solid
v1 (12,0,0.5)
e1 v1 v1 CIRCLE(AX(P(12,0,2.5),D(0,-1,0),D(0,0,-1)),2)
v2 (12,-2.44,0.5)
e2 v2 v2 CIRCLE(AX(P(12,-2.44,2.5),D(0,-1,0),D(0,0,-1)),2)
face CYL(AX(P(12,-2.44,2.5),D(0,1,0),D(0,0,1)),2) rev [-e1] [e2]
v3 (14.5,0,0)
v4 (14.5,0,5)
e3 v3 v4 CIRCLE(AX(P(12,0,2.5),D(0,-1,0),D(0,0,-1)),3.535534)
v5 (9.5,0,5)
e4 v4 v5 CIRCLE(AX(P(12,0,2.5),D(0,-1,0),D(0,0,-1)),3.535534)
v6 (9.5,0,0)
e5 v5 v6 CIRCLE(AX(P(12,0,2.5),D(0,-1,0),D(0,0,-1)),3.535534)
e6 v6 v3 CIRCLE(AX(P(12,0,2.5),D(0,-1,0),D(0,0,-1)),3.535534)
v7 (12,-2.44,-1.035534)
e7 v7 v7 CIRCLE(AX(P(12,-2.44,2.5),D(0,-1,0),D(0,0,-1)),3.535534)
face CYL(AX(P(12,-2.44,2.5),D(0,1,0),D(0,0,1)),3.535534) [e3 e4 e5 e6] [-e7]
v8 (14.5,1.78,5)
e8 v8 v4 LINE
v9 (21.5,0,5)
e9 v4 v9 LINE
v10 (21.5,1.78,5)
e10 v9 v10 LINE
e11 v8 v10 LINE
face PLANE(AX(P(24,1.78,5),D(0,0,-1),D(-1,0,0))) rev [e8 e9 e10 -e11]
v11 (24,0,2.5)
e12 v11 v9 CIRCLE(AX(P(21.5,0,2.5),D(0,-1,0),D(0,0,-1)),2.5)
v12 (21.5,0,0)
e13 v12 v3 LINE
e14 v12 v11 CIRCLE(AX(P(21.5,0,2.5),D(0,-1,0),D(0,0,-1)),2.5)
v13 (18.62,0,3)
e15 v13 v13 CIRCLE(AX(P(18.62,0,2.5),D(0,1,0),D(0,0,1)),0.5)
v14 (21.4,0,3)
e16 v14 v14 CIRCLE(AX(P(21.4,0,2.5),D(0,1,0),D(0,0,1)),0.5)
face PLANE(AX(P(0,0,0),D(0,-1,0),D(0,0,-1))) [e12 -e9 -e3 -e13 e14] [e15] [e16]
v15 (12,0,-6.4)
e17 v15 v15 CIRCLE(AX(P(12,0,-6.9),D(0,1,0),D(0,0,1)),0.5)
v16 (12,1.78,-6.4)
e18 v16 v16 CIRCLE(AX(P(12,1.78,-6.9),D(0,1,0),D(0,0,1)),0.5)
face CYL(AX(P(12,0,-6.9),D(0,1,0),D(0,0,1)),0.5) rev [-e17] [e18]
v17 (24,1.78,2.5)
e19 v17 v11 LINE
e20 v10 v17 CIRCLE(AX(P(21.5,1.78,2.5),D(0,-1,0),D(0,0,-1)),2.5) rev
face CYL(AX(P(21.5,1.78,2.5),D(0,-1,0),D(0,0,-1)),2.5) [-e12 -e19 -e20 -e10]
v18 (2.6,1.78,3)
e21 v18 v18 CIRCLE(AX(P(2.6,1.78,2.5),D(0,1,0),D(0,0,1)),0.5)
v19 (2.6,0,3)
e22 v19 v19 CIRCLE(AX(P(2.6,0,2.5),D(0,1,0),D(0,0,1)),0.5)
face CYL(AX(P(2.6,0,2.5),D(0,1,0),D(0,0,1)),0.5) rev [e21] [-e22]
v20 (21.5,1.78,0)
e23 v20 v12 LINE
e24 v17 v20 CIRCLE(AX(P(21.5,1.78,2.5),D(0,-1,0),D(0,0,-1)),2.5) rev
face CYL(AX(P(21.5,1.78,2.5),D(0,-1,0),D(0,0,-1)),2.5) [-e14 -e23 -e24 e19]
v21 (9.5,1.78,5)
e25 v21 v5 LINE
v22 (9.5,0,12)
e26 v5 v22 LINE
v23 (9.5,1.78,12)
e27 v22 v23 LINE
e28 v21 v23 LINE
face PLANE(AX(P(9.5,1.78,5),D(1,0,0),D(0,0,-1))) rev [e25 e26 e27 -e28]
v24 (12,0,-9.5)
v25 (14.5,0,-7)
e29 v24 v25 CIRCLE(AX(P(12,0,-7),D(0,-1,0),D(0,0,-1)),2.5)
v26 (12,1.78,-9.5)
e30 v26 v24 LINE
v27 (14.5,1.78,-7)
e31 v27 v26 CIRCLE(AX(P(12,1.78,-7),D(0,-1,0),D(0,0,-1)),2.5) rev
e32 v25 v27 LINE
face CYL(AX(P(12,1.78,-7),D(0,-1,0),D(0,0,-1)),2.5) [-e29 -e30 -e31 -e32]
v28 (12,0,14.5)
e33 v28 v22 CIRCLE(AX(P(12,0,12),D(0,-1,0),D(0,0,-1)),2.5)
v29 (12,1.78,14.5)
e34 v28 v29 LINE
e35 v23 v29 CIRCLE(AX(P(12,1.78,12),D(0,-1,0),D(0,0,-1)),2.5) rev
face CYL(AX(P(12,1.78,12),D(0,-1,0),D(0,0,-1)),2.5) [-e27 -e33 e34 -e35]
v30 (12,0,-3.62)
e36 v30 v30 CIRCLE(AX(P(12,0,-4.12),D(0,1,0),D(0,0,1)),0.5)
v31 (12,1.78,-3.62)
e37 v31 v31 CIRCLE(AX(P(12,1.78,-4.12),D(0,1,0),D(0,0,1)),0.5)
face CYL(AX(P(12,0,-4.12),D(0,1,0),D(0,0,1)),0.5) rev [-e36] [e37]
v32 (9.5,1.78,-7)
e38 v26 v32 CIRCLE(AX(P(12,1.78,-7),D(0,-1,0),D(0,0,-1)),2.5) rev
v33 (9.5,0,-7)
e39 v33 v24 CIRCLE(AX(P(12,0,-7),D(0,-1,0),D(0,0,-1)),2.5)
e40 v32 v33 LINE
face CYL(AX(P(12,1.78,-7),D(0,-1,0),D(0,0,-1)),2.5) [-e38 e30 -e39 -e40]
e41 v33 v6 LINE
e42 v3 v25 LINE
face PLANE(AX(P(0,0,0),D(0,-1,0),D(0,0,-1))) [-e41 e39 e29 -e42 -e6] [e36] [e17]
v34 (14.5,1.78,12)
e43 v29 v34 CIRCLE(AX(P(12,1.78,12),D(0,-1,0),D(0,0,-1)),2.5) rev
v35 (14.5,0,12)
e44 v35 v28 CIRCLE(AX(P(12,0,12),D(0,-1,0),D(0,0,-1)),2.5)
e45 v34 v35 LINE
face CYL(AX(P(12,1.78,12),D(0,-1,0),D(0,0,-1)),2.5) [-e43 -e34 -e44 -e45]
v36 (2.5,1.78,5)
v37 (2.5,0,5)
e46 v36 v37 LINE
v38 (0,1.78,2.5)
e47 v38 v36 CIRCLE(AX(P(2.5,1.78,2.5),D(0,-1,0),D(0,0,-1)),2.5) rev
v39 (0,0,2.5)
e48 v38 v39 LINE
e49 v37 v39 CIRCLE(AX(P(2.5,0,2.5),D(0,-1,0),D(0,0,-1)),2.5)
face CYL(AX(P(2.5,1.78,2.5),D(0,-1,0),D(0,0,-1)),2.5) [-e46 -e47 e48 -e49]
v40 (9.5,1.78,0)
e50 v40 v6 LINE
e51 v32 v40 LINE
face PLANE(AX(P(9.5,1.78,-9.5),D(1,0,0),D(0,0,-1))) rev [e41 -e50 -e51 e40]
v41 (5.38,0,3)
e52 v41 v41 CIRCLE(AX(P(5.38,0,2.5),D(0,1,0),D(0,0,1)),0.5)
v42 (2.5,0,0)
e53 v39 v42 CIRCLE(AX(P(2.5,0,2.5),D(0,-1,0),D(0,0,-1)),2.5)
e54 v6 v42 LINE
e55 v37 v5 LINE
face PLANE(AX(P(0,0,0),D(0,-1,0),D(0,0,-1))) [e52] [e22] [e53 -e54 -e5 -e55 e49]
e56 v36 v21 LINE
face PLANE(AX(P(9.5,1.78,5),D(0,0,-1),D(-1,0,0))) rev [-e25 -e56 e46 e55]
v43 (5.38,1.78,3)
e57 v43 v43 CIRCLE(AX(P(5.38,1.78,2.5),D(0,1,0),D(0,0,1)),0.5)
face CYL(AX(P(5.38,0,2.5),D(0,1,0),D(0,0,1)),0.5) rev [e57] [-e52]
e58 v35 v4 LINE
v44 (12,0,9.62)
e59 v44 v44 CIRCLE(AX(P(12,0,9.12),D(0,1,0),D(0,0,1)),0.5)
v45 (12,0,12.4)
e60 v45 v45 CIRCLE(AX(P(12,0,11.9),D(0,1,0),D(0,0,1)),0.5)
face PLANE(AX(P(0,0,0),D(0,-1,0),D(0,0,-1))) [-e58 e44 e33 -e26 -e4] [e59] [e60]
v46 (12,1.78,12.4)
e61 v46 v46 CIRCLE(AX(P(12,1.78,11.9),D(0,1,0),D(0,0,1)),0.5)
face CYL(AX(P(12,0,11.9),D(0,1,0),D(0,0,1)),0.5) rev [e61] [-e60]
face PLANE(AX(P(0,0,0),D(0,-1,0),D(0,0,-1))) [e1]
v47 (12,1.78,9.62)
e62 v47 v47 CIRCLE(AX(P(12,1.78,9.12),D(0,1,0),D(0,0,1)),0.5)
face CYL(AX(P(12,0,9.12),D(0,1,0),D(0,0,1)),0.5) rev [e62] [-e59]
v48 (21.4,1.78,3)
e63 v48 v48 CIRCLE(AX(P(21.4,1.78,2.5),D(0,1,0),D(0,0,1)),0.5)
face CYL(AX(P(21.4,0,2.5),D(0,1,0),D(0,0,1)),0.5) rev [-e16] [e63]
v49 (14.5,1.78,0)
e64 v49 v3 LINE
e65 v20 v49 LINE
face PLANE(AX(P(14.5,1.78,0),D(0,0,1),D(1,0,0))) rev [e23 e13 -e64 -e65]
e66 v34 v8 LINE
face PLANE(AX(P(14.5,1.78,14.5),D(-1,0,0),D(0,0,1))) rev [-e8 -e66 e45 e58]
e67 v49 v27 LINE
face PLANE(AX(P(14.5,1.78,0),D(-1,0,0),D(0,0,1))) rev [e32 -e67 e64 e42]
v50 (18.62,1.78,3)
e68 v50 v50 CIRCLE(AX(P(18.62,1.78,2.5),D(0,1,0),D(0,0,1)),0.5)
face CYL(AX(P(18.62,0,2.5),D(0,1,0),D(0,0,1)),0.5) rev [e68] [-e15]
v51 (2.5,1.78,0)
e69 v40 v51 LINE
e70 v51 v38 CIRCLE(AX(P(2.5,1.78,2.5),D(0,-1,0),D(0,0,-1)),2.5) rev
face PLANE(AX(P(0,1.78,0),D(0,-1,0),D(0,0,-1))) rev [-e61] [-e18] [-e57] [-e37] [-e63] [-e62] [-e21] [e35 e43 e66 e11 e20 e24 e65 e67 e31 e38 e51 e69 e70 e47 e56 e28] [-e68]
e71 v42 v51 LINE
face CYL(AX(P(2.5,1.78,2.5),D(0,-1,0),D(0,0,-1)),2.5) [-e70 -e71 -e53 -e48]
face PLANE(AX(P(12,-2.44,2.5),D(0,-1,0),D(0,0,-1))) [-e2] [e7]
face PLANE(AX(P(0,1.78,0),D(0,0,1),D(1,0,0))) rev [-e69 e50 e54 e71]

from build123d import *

# Parameters (mm, degrees)
EXTRUDE_1_DEPTH     = 1.78
FILLET_1_R          = 2.5
SKETCH_2_R          = 0.5
CUT_EXTRUDE_2_DEPTH = 1.78
SKETCH_4_R          = 3.535533906
SKETCH_4_R_2        = 2
EXTRUDE_2_DEPTH     = 2.44


with BuildPart() as part:
    # 草图1 → 凸台-拉伸1 (new body)
    with BuildSketch(Plane(origin=(0, 0, 0), x_dir=(1, 0, 0), z_dir=(0, 1, 0))):
        Polygon((0, 0), (9.5, 0), (9.5, 9.5), (14.5, 9.5), (14.5, 0), (24, 0), (24, -5), (14.5, -5), (14.5, -14.5), (9.5, -14.5), (9.5, -5), (0, -5), align=None)
    extrude(amount=EXTRUDE_1_DEPTH)

    # 圆角1
    fillet_1_edges = [part.edges().sort_by_distance(p)[0] for p in [
        (0, 0.89, 5),
        (0, 0.89, 0),
        (9.5, 0.89, -9.5),
        (14.5, 0.89, -9.5),
        (24, 0.89, 0),
        (24, 0.89, 5),
        (9.5, 0.89, 14.5),
        (14.5, 0.89, 14.5),
    ]]
    fillet(fillet_1_edges, radius=FILLET_1_R - 0.0001)  # a hair under: the kernel refuses the full size

    # 草图2 → 切除-拉伸2 (cut)
    with BuildSketch(Plane(origin=(0, 1.78, 0), x_dir=(1, 0, 0), z_dir=(0, 1, 0))):
        with Locations(Location((2.6, -2.5, 0), (0, 0, 270))):
            Circle(SKETCH_2_R)
        with Locations(Location((5.38, -2.5, 0), (0, 0, 270))):
            Circle(SKETCH_2_R)
        with Locations(Location((12, 6.9, 0), (0, 0, 270))):
            Circle(SKETCH_2_R)
        with Locations(Location((12, 4.12, 0), (0, 0, 270))):
            Circle(SKETCH_2_R)
        with Locations(Location((21.4, -2.5, 0), (0, 0, 270))):
            Circle(SKETCH_2_R)
        with Locations(Location((18.62, -2.5, 0), (0, 0, 270))):
            Circle(SKETCH_2_R)
        with Locations(Location((12, -11.9, 0), (0, 0, 270))):
            Circle(SKETCH_2_R)
        with Locations(Location((12, -9.12, 0), (0, 0, 270))):
            Circle(SKETCH_2_R)
    extrude(amount=-CUT_EXTRUDE_2_DEPTH, mode=Mode.SUBTRACT)

    # 草图4 → 凸台-拉伸2 (add)
    with BuildSketch(Plane.XZ):
        with Locations(Location((12, 2.5, 0), (0, 0, 45))):
            Circle(SKETCH_4_R)
        with Locations(Location((12, 2.5, 0), (0, 0, 270))):
            Circle(SKETCH_4_R_2, mode=Mode.SUBTRACT)
    extrude(amount=EXTRUDE_2_DEPTH)


solid = part.part
